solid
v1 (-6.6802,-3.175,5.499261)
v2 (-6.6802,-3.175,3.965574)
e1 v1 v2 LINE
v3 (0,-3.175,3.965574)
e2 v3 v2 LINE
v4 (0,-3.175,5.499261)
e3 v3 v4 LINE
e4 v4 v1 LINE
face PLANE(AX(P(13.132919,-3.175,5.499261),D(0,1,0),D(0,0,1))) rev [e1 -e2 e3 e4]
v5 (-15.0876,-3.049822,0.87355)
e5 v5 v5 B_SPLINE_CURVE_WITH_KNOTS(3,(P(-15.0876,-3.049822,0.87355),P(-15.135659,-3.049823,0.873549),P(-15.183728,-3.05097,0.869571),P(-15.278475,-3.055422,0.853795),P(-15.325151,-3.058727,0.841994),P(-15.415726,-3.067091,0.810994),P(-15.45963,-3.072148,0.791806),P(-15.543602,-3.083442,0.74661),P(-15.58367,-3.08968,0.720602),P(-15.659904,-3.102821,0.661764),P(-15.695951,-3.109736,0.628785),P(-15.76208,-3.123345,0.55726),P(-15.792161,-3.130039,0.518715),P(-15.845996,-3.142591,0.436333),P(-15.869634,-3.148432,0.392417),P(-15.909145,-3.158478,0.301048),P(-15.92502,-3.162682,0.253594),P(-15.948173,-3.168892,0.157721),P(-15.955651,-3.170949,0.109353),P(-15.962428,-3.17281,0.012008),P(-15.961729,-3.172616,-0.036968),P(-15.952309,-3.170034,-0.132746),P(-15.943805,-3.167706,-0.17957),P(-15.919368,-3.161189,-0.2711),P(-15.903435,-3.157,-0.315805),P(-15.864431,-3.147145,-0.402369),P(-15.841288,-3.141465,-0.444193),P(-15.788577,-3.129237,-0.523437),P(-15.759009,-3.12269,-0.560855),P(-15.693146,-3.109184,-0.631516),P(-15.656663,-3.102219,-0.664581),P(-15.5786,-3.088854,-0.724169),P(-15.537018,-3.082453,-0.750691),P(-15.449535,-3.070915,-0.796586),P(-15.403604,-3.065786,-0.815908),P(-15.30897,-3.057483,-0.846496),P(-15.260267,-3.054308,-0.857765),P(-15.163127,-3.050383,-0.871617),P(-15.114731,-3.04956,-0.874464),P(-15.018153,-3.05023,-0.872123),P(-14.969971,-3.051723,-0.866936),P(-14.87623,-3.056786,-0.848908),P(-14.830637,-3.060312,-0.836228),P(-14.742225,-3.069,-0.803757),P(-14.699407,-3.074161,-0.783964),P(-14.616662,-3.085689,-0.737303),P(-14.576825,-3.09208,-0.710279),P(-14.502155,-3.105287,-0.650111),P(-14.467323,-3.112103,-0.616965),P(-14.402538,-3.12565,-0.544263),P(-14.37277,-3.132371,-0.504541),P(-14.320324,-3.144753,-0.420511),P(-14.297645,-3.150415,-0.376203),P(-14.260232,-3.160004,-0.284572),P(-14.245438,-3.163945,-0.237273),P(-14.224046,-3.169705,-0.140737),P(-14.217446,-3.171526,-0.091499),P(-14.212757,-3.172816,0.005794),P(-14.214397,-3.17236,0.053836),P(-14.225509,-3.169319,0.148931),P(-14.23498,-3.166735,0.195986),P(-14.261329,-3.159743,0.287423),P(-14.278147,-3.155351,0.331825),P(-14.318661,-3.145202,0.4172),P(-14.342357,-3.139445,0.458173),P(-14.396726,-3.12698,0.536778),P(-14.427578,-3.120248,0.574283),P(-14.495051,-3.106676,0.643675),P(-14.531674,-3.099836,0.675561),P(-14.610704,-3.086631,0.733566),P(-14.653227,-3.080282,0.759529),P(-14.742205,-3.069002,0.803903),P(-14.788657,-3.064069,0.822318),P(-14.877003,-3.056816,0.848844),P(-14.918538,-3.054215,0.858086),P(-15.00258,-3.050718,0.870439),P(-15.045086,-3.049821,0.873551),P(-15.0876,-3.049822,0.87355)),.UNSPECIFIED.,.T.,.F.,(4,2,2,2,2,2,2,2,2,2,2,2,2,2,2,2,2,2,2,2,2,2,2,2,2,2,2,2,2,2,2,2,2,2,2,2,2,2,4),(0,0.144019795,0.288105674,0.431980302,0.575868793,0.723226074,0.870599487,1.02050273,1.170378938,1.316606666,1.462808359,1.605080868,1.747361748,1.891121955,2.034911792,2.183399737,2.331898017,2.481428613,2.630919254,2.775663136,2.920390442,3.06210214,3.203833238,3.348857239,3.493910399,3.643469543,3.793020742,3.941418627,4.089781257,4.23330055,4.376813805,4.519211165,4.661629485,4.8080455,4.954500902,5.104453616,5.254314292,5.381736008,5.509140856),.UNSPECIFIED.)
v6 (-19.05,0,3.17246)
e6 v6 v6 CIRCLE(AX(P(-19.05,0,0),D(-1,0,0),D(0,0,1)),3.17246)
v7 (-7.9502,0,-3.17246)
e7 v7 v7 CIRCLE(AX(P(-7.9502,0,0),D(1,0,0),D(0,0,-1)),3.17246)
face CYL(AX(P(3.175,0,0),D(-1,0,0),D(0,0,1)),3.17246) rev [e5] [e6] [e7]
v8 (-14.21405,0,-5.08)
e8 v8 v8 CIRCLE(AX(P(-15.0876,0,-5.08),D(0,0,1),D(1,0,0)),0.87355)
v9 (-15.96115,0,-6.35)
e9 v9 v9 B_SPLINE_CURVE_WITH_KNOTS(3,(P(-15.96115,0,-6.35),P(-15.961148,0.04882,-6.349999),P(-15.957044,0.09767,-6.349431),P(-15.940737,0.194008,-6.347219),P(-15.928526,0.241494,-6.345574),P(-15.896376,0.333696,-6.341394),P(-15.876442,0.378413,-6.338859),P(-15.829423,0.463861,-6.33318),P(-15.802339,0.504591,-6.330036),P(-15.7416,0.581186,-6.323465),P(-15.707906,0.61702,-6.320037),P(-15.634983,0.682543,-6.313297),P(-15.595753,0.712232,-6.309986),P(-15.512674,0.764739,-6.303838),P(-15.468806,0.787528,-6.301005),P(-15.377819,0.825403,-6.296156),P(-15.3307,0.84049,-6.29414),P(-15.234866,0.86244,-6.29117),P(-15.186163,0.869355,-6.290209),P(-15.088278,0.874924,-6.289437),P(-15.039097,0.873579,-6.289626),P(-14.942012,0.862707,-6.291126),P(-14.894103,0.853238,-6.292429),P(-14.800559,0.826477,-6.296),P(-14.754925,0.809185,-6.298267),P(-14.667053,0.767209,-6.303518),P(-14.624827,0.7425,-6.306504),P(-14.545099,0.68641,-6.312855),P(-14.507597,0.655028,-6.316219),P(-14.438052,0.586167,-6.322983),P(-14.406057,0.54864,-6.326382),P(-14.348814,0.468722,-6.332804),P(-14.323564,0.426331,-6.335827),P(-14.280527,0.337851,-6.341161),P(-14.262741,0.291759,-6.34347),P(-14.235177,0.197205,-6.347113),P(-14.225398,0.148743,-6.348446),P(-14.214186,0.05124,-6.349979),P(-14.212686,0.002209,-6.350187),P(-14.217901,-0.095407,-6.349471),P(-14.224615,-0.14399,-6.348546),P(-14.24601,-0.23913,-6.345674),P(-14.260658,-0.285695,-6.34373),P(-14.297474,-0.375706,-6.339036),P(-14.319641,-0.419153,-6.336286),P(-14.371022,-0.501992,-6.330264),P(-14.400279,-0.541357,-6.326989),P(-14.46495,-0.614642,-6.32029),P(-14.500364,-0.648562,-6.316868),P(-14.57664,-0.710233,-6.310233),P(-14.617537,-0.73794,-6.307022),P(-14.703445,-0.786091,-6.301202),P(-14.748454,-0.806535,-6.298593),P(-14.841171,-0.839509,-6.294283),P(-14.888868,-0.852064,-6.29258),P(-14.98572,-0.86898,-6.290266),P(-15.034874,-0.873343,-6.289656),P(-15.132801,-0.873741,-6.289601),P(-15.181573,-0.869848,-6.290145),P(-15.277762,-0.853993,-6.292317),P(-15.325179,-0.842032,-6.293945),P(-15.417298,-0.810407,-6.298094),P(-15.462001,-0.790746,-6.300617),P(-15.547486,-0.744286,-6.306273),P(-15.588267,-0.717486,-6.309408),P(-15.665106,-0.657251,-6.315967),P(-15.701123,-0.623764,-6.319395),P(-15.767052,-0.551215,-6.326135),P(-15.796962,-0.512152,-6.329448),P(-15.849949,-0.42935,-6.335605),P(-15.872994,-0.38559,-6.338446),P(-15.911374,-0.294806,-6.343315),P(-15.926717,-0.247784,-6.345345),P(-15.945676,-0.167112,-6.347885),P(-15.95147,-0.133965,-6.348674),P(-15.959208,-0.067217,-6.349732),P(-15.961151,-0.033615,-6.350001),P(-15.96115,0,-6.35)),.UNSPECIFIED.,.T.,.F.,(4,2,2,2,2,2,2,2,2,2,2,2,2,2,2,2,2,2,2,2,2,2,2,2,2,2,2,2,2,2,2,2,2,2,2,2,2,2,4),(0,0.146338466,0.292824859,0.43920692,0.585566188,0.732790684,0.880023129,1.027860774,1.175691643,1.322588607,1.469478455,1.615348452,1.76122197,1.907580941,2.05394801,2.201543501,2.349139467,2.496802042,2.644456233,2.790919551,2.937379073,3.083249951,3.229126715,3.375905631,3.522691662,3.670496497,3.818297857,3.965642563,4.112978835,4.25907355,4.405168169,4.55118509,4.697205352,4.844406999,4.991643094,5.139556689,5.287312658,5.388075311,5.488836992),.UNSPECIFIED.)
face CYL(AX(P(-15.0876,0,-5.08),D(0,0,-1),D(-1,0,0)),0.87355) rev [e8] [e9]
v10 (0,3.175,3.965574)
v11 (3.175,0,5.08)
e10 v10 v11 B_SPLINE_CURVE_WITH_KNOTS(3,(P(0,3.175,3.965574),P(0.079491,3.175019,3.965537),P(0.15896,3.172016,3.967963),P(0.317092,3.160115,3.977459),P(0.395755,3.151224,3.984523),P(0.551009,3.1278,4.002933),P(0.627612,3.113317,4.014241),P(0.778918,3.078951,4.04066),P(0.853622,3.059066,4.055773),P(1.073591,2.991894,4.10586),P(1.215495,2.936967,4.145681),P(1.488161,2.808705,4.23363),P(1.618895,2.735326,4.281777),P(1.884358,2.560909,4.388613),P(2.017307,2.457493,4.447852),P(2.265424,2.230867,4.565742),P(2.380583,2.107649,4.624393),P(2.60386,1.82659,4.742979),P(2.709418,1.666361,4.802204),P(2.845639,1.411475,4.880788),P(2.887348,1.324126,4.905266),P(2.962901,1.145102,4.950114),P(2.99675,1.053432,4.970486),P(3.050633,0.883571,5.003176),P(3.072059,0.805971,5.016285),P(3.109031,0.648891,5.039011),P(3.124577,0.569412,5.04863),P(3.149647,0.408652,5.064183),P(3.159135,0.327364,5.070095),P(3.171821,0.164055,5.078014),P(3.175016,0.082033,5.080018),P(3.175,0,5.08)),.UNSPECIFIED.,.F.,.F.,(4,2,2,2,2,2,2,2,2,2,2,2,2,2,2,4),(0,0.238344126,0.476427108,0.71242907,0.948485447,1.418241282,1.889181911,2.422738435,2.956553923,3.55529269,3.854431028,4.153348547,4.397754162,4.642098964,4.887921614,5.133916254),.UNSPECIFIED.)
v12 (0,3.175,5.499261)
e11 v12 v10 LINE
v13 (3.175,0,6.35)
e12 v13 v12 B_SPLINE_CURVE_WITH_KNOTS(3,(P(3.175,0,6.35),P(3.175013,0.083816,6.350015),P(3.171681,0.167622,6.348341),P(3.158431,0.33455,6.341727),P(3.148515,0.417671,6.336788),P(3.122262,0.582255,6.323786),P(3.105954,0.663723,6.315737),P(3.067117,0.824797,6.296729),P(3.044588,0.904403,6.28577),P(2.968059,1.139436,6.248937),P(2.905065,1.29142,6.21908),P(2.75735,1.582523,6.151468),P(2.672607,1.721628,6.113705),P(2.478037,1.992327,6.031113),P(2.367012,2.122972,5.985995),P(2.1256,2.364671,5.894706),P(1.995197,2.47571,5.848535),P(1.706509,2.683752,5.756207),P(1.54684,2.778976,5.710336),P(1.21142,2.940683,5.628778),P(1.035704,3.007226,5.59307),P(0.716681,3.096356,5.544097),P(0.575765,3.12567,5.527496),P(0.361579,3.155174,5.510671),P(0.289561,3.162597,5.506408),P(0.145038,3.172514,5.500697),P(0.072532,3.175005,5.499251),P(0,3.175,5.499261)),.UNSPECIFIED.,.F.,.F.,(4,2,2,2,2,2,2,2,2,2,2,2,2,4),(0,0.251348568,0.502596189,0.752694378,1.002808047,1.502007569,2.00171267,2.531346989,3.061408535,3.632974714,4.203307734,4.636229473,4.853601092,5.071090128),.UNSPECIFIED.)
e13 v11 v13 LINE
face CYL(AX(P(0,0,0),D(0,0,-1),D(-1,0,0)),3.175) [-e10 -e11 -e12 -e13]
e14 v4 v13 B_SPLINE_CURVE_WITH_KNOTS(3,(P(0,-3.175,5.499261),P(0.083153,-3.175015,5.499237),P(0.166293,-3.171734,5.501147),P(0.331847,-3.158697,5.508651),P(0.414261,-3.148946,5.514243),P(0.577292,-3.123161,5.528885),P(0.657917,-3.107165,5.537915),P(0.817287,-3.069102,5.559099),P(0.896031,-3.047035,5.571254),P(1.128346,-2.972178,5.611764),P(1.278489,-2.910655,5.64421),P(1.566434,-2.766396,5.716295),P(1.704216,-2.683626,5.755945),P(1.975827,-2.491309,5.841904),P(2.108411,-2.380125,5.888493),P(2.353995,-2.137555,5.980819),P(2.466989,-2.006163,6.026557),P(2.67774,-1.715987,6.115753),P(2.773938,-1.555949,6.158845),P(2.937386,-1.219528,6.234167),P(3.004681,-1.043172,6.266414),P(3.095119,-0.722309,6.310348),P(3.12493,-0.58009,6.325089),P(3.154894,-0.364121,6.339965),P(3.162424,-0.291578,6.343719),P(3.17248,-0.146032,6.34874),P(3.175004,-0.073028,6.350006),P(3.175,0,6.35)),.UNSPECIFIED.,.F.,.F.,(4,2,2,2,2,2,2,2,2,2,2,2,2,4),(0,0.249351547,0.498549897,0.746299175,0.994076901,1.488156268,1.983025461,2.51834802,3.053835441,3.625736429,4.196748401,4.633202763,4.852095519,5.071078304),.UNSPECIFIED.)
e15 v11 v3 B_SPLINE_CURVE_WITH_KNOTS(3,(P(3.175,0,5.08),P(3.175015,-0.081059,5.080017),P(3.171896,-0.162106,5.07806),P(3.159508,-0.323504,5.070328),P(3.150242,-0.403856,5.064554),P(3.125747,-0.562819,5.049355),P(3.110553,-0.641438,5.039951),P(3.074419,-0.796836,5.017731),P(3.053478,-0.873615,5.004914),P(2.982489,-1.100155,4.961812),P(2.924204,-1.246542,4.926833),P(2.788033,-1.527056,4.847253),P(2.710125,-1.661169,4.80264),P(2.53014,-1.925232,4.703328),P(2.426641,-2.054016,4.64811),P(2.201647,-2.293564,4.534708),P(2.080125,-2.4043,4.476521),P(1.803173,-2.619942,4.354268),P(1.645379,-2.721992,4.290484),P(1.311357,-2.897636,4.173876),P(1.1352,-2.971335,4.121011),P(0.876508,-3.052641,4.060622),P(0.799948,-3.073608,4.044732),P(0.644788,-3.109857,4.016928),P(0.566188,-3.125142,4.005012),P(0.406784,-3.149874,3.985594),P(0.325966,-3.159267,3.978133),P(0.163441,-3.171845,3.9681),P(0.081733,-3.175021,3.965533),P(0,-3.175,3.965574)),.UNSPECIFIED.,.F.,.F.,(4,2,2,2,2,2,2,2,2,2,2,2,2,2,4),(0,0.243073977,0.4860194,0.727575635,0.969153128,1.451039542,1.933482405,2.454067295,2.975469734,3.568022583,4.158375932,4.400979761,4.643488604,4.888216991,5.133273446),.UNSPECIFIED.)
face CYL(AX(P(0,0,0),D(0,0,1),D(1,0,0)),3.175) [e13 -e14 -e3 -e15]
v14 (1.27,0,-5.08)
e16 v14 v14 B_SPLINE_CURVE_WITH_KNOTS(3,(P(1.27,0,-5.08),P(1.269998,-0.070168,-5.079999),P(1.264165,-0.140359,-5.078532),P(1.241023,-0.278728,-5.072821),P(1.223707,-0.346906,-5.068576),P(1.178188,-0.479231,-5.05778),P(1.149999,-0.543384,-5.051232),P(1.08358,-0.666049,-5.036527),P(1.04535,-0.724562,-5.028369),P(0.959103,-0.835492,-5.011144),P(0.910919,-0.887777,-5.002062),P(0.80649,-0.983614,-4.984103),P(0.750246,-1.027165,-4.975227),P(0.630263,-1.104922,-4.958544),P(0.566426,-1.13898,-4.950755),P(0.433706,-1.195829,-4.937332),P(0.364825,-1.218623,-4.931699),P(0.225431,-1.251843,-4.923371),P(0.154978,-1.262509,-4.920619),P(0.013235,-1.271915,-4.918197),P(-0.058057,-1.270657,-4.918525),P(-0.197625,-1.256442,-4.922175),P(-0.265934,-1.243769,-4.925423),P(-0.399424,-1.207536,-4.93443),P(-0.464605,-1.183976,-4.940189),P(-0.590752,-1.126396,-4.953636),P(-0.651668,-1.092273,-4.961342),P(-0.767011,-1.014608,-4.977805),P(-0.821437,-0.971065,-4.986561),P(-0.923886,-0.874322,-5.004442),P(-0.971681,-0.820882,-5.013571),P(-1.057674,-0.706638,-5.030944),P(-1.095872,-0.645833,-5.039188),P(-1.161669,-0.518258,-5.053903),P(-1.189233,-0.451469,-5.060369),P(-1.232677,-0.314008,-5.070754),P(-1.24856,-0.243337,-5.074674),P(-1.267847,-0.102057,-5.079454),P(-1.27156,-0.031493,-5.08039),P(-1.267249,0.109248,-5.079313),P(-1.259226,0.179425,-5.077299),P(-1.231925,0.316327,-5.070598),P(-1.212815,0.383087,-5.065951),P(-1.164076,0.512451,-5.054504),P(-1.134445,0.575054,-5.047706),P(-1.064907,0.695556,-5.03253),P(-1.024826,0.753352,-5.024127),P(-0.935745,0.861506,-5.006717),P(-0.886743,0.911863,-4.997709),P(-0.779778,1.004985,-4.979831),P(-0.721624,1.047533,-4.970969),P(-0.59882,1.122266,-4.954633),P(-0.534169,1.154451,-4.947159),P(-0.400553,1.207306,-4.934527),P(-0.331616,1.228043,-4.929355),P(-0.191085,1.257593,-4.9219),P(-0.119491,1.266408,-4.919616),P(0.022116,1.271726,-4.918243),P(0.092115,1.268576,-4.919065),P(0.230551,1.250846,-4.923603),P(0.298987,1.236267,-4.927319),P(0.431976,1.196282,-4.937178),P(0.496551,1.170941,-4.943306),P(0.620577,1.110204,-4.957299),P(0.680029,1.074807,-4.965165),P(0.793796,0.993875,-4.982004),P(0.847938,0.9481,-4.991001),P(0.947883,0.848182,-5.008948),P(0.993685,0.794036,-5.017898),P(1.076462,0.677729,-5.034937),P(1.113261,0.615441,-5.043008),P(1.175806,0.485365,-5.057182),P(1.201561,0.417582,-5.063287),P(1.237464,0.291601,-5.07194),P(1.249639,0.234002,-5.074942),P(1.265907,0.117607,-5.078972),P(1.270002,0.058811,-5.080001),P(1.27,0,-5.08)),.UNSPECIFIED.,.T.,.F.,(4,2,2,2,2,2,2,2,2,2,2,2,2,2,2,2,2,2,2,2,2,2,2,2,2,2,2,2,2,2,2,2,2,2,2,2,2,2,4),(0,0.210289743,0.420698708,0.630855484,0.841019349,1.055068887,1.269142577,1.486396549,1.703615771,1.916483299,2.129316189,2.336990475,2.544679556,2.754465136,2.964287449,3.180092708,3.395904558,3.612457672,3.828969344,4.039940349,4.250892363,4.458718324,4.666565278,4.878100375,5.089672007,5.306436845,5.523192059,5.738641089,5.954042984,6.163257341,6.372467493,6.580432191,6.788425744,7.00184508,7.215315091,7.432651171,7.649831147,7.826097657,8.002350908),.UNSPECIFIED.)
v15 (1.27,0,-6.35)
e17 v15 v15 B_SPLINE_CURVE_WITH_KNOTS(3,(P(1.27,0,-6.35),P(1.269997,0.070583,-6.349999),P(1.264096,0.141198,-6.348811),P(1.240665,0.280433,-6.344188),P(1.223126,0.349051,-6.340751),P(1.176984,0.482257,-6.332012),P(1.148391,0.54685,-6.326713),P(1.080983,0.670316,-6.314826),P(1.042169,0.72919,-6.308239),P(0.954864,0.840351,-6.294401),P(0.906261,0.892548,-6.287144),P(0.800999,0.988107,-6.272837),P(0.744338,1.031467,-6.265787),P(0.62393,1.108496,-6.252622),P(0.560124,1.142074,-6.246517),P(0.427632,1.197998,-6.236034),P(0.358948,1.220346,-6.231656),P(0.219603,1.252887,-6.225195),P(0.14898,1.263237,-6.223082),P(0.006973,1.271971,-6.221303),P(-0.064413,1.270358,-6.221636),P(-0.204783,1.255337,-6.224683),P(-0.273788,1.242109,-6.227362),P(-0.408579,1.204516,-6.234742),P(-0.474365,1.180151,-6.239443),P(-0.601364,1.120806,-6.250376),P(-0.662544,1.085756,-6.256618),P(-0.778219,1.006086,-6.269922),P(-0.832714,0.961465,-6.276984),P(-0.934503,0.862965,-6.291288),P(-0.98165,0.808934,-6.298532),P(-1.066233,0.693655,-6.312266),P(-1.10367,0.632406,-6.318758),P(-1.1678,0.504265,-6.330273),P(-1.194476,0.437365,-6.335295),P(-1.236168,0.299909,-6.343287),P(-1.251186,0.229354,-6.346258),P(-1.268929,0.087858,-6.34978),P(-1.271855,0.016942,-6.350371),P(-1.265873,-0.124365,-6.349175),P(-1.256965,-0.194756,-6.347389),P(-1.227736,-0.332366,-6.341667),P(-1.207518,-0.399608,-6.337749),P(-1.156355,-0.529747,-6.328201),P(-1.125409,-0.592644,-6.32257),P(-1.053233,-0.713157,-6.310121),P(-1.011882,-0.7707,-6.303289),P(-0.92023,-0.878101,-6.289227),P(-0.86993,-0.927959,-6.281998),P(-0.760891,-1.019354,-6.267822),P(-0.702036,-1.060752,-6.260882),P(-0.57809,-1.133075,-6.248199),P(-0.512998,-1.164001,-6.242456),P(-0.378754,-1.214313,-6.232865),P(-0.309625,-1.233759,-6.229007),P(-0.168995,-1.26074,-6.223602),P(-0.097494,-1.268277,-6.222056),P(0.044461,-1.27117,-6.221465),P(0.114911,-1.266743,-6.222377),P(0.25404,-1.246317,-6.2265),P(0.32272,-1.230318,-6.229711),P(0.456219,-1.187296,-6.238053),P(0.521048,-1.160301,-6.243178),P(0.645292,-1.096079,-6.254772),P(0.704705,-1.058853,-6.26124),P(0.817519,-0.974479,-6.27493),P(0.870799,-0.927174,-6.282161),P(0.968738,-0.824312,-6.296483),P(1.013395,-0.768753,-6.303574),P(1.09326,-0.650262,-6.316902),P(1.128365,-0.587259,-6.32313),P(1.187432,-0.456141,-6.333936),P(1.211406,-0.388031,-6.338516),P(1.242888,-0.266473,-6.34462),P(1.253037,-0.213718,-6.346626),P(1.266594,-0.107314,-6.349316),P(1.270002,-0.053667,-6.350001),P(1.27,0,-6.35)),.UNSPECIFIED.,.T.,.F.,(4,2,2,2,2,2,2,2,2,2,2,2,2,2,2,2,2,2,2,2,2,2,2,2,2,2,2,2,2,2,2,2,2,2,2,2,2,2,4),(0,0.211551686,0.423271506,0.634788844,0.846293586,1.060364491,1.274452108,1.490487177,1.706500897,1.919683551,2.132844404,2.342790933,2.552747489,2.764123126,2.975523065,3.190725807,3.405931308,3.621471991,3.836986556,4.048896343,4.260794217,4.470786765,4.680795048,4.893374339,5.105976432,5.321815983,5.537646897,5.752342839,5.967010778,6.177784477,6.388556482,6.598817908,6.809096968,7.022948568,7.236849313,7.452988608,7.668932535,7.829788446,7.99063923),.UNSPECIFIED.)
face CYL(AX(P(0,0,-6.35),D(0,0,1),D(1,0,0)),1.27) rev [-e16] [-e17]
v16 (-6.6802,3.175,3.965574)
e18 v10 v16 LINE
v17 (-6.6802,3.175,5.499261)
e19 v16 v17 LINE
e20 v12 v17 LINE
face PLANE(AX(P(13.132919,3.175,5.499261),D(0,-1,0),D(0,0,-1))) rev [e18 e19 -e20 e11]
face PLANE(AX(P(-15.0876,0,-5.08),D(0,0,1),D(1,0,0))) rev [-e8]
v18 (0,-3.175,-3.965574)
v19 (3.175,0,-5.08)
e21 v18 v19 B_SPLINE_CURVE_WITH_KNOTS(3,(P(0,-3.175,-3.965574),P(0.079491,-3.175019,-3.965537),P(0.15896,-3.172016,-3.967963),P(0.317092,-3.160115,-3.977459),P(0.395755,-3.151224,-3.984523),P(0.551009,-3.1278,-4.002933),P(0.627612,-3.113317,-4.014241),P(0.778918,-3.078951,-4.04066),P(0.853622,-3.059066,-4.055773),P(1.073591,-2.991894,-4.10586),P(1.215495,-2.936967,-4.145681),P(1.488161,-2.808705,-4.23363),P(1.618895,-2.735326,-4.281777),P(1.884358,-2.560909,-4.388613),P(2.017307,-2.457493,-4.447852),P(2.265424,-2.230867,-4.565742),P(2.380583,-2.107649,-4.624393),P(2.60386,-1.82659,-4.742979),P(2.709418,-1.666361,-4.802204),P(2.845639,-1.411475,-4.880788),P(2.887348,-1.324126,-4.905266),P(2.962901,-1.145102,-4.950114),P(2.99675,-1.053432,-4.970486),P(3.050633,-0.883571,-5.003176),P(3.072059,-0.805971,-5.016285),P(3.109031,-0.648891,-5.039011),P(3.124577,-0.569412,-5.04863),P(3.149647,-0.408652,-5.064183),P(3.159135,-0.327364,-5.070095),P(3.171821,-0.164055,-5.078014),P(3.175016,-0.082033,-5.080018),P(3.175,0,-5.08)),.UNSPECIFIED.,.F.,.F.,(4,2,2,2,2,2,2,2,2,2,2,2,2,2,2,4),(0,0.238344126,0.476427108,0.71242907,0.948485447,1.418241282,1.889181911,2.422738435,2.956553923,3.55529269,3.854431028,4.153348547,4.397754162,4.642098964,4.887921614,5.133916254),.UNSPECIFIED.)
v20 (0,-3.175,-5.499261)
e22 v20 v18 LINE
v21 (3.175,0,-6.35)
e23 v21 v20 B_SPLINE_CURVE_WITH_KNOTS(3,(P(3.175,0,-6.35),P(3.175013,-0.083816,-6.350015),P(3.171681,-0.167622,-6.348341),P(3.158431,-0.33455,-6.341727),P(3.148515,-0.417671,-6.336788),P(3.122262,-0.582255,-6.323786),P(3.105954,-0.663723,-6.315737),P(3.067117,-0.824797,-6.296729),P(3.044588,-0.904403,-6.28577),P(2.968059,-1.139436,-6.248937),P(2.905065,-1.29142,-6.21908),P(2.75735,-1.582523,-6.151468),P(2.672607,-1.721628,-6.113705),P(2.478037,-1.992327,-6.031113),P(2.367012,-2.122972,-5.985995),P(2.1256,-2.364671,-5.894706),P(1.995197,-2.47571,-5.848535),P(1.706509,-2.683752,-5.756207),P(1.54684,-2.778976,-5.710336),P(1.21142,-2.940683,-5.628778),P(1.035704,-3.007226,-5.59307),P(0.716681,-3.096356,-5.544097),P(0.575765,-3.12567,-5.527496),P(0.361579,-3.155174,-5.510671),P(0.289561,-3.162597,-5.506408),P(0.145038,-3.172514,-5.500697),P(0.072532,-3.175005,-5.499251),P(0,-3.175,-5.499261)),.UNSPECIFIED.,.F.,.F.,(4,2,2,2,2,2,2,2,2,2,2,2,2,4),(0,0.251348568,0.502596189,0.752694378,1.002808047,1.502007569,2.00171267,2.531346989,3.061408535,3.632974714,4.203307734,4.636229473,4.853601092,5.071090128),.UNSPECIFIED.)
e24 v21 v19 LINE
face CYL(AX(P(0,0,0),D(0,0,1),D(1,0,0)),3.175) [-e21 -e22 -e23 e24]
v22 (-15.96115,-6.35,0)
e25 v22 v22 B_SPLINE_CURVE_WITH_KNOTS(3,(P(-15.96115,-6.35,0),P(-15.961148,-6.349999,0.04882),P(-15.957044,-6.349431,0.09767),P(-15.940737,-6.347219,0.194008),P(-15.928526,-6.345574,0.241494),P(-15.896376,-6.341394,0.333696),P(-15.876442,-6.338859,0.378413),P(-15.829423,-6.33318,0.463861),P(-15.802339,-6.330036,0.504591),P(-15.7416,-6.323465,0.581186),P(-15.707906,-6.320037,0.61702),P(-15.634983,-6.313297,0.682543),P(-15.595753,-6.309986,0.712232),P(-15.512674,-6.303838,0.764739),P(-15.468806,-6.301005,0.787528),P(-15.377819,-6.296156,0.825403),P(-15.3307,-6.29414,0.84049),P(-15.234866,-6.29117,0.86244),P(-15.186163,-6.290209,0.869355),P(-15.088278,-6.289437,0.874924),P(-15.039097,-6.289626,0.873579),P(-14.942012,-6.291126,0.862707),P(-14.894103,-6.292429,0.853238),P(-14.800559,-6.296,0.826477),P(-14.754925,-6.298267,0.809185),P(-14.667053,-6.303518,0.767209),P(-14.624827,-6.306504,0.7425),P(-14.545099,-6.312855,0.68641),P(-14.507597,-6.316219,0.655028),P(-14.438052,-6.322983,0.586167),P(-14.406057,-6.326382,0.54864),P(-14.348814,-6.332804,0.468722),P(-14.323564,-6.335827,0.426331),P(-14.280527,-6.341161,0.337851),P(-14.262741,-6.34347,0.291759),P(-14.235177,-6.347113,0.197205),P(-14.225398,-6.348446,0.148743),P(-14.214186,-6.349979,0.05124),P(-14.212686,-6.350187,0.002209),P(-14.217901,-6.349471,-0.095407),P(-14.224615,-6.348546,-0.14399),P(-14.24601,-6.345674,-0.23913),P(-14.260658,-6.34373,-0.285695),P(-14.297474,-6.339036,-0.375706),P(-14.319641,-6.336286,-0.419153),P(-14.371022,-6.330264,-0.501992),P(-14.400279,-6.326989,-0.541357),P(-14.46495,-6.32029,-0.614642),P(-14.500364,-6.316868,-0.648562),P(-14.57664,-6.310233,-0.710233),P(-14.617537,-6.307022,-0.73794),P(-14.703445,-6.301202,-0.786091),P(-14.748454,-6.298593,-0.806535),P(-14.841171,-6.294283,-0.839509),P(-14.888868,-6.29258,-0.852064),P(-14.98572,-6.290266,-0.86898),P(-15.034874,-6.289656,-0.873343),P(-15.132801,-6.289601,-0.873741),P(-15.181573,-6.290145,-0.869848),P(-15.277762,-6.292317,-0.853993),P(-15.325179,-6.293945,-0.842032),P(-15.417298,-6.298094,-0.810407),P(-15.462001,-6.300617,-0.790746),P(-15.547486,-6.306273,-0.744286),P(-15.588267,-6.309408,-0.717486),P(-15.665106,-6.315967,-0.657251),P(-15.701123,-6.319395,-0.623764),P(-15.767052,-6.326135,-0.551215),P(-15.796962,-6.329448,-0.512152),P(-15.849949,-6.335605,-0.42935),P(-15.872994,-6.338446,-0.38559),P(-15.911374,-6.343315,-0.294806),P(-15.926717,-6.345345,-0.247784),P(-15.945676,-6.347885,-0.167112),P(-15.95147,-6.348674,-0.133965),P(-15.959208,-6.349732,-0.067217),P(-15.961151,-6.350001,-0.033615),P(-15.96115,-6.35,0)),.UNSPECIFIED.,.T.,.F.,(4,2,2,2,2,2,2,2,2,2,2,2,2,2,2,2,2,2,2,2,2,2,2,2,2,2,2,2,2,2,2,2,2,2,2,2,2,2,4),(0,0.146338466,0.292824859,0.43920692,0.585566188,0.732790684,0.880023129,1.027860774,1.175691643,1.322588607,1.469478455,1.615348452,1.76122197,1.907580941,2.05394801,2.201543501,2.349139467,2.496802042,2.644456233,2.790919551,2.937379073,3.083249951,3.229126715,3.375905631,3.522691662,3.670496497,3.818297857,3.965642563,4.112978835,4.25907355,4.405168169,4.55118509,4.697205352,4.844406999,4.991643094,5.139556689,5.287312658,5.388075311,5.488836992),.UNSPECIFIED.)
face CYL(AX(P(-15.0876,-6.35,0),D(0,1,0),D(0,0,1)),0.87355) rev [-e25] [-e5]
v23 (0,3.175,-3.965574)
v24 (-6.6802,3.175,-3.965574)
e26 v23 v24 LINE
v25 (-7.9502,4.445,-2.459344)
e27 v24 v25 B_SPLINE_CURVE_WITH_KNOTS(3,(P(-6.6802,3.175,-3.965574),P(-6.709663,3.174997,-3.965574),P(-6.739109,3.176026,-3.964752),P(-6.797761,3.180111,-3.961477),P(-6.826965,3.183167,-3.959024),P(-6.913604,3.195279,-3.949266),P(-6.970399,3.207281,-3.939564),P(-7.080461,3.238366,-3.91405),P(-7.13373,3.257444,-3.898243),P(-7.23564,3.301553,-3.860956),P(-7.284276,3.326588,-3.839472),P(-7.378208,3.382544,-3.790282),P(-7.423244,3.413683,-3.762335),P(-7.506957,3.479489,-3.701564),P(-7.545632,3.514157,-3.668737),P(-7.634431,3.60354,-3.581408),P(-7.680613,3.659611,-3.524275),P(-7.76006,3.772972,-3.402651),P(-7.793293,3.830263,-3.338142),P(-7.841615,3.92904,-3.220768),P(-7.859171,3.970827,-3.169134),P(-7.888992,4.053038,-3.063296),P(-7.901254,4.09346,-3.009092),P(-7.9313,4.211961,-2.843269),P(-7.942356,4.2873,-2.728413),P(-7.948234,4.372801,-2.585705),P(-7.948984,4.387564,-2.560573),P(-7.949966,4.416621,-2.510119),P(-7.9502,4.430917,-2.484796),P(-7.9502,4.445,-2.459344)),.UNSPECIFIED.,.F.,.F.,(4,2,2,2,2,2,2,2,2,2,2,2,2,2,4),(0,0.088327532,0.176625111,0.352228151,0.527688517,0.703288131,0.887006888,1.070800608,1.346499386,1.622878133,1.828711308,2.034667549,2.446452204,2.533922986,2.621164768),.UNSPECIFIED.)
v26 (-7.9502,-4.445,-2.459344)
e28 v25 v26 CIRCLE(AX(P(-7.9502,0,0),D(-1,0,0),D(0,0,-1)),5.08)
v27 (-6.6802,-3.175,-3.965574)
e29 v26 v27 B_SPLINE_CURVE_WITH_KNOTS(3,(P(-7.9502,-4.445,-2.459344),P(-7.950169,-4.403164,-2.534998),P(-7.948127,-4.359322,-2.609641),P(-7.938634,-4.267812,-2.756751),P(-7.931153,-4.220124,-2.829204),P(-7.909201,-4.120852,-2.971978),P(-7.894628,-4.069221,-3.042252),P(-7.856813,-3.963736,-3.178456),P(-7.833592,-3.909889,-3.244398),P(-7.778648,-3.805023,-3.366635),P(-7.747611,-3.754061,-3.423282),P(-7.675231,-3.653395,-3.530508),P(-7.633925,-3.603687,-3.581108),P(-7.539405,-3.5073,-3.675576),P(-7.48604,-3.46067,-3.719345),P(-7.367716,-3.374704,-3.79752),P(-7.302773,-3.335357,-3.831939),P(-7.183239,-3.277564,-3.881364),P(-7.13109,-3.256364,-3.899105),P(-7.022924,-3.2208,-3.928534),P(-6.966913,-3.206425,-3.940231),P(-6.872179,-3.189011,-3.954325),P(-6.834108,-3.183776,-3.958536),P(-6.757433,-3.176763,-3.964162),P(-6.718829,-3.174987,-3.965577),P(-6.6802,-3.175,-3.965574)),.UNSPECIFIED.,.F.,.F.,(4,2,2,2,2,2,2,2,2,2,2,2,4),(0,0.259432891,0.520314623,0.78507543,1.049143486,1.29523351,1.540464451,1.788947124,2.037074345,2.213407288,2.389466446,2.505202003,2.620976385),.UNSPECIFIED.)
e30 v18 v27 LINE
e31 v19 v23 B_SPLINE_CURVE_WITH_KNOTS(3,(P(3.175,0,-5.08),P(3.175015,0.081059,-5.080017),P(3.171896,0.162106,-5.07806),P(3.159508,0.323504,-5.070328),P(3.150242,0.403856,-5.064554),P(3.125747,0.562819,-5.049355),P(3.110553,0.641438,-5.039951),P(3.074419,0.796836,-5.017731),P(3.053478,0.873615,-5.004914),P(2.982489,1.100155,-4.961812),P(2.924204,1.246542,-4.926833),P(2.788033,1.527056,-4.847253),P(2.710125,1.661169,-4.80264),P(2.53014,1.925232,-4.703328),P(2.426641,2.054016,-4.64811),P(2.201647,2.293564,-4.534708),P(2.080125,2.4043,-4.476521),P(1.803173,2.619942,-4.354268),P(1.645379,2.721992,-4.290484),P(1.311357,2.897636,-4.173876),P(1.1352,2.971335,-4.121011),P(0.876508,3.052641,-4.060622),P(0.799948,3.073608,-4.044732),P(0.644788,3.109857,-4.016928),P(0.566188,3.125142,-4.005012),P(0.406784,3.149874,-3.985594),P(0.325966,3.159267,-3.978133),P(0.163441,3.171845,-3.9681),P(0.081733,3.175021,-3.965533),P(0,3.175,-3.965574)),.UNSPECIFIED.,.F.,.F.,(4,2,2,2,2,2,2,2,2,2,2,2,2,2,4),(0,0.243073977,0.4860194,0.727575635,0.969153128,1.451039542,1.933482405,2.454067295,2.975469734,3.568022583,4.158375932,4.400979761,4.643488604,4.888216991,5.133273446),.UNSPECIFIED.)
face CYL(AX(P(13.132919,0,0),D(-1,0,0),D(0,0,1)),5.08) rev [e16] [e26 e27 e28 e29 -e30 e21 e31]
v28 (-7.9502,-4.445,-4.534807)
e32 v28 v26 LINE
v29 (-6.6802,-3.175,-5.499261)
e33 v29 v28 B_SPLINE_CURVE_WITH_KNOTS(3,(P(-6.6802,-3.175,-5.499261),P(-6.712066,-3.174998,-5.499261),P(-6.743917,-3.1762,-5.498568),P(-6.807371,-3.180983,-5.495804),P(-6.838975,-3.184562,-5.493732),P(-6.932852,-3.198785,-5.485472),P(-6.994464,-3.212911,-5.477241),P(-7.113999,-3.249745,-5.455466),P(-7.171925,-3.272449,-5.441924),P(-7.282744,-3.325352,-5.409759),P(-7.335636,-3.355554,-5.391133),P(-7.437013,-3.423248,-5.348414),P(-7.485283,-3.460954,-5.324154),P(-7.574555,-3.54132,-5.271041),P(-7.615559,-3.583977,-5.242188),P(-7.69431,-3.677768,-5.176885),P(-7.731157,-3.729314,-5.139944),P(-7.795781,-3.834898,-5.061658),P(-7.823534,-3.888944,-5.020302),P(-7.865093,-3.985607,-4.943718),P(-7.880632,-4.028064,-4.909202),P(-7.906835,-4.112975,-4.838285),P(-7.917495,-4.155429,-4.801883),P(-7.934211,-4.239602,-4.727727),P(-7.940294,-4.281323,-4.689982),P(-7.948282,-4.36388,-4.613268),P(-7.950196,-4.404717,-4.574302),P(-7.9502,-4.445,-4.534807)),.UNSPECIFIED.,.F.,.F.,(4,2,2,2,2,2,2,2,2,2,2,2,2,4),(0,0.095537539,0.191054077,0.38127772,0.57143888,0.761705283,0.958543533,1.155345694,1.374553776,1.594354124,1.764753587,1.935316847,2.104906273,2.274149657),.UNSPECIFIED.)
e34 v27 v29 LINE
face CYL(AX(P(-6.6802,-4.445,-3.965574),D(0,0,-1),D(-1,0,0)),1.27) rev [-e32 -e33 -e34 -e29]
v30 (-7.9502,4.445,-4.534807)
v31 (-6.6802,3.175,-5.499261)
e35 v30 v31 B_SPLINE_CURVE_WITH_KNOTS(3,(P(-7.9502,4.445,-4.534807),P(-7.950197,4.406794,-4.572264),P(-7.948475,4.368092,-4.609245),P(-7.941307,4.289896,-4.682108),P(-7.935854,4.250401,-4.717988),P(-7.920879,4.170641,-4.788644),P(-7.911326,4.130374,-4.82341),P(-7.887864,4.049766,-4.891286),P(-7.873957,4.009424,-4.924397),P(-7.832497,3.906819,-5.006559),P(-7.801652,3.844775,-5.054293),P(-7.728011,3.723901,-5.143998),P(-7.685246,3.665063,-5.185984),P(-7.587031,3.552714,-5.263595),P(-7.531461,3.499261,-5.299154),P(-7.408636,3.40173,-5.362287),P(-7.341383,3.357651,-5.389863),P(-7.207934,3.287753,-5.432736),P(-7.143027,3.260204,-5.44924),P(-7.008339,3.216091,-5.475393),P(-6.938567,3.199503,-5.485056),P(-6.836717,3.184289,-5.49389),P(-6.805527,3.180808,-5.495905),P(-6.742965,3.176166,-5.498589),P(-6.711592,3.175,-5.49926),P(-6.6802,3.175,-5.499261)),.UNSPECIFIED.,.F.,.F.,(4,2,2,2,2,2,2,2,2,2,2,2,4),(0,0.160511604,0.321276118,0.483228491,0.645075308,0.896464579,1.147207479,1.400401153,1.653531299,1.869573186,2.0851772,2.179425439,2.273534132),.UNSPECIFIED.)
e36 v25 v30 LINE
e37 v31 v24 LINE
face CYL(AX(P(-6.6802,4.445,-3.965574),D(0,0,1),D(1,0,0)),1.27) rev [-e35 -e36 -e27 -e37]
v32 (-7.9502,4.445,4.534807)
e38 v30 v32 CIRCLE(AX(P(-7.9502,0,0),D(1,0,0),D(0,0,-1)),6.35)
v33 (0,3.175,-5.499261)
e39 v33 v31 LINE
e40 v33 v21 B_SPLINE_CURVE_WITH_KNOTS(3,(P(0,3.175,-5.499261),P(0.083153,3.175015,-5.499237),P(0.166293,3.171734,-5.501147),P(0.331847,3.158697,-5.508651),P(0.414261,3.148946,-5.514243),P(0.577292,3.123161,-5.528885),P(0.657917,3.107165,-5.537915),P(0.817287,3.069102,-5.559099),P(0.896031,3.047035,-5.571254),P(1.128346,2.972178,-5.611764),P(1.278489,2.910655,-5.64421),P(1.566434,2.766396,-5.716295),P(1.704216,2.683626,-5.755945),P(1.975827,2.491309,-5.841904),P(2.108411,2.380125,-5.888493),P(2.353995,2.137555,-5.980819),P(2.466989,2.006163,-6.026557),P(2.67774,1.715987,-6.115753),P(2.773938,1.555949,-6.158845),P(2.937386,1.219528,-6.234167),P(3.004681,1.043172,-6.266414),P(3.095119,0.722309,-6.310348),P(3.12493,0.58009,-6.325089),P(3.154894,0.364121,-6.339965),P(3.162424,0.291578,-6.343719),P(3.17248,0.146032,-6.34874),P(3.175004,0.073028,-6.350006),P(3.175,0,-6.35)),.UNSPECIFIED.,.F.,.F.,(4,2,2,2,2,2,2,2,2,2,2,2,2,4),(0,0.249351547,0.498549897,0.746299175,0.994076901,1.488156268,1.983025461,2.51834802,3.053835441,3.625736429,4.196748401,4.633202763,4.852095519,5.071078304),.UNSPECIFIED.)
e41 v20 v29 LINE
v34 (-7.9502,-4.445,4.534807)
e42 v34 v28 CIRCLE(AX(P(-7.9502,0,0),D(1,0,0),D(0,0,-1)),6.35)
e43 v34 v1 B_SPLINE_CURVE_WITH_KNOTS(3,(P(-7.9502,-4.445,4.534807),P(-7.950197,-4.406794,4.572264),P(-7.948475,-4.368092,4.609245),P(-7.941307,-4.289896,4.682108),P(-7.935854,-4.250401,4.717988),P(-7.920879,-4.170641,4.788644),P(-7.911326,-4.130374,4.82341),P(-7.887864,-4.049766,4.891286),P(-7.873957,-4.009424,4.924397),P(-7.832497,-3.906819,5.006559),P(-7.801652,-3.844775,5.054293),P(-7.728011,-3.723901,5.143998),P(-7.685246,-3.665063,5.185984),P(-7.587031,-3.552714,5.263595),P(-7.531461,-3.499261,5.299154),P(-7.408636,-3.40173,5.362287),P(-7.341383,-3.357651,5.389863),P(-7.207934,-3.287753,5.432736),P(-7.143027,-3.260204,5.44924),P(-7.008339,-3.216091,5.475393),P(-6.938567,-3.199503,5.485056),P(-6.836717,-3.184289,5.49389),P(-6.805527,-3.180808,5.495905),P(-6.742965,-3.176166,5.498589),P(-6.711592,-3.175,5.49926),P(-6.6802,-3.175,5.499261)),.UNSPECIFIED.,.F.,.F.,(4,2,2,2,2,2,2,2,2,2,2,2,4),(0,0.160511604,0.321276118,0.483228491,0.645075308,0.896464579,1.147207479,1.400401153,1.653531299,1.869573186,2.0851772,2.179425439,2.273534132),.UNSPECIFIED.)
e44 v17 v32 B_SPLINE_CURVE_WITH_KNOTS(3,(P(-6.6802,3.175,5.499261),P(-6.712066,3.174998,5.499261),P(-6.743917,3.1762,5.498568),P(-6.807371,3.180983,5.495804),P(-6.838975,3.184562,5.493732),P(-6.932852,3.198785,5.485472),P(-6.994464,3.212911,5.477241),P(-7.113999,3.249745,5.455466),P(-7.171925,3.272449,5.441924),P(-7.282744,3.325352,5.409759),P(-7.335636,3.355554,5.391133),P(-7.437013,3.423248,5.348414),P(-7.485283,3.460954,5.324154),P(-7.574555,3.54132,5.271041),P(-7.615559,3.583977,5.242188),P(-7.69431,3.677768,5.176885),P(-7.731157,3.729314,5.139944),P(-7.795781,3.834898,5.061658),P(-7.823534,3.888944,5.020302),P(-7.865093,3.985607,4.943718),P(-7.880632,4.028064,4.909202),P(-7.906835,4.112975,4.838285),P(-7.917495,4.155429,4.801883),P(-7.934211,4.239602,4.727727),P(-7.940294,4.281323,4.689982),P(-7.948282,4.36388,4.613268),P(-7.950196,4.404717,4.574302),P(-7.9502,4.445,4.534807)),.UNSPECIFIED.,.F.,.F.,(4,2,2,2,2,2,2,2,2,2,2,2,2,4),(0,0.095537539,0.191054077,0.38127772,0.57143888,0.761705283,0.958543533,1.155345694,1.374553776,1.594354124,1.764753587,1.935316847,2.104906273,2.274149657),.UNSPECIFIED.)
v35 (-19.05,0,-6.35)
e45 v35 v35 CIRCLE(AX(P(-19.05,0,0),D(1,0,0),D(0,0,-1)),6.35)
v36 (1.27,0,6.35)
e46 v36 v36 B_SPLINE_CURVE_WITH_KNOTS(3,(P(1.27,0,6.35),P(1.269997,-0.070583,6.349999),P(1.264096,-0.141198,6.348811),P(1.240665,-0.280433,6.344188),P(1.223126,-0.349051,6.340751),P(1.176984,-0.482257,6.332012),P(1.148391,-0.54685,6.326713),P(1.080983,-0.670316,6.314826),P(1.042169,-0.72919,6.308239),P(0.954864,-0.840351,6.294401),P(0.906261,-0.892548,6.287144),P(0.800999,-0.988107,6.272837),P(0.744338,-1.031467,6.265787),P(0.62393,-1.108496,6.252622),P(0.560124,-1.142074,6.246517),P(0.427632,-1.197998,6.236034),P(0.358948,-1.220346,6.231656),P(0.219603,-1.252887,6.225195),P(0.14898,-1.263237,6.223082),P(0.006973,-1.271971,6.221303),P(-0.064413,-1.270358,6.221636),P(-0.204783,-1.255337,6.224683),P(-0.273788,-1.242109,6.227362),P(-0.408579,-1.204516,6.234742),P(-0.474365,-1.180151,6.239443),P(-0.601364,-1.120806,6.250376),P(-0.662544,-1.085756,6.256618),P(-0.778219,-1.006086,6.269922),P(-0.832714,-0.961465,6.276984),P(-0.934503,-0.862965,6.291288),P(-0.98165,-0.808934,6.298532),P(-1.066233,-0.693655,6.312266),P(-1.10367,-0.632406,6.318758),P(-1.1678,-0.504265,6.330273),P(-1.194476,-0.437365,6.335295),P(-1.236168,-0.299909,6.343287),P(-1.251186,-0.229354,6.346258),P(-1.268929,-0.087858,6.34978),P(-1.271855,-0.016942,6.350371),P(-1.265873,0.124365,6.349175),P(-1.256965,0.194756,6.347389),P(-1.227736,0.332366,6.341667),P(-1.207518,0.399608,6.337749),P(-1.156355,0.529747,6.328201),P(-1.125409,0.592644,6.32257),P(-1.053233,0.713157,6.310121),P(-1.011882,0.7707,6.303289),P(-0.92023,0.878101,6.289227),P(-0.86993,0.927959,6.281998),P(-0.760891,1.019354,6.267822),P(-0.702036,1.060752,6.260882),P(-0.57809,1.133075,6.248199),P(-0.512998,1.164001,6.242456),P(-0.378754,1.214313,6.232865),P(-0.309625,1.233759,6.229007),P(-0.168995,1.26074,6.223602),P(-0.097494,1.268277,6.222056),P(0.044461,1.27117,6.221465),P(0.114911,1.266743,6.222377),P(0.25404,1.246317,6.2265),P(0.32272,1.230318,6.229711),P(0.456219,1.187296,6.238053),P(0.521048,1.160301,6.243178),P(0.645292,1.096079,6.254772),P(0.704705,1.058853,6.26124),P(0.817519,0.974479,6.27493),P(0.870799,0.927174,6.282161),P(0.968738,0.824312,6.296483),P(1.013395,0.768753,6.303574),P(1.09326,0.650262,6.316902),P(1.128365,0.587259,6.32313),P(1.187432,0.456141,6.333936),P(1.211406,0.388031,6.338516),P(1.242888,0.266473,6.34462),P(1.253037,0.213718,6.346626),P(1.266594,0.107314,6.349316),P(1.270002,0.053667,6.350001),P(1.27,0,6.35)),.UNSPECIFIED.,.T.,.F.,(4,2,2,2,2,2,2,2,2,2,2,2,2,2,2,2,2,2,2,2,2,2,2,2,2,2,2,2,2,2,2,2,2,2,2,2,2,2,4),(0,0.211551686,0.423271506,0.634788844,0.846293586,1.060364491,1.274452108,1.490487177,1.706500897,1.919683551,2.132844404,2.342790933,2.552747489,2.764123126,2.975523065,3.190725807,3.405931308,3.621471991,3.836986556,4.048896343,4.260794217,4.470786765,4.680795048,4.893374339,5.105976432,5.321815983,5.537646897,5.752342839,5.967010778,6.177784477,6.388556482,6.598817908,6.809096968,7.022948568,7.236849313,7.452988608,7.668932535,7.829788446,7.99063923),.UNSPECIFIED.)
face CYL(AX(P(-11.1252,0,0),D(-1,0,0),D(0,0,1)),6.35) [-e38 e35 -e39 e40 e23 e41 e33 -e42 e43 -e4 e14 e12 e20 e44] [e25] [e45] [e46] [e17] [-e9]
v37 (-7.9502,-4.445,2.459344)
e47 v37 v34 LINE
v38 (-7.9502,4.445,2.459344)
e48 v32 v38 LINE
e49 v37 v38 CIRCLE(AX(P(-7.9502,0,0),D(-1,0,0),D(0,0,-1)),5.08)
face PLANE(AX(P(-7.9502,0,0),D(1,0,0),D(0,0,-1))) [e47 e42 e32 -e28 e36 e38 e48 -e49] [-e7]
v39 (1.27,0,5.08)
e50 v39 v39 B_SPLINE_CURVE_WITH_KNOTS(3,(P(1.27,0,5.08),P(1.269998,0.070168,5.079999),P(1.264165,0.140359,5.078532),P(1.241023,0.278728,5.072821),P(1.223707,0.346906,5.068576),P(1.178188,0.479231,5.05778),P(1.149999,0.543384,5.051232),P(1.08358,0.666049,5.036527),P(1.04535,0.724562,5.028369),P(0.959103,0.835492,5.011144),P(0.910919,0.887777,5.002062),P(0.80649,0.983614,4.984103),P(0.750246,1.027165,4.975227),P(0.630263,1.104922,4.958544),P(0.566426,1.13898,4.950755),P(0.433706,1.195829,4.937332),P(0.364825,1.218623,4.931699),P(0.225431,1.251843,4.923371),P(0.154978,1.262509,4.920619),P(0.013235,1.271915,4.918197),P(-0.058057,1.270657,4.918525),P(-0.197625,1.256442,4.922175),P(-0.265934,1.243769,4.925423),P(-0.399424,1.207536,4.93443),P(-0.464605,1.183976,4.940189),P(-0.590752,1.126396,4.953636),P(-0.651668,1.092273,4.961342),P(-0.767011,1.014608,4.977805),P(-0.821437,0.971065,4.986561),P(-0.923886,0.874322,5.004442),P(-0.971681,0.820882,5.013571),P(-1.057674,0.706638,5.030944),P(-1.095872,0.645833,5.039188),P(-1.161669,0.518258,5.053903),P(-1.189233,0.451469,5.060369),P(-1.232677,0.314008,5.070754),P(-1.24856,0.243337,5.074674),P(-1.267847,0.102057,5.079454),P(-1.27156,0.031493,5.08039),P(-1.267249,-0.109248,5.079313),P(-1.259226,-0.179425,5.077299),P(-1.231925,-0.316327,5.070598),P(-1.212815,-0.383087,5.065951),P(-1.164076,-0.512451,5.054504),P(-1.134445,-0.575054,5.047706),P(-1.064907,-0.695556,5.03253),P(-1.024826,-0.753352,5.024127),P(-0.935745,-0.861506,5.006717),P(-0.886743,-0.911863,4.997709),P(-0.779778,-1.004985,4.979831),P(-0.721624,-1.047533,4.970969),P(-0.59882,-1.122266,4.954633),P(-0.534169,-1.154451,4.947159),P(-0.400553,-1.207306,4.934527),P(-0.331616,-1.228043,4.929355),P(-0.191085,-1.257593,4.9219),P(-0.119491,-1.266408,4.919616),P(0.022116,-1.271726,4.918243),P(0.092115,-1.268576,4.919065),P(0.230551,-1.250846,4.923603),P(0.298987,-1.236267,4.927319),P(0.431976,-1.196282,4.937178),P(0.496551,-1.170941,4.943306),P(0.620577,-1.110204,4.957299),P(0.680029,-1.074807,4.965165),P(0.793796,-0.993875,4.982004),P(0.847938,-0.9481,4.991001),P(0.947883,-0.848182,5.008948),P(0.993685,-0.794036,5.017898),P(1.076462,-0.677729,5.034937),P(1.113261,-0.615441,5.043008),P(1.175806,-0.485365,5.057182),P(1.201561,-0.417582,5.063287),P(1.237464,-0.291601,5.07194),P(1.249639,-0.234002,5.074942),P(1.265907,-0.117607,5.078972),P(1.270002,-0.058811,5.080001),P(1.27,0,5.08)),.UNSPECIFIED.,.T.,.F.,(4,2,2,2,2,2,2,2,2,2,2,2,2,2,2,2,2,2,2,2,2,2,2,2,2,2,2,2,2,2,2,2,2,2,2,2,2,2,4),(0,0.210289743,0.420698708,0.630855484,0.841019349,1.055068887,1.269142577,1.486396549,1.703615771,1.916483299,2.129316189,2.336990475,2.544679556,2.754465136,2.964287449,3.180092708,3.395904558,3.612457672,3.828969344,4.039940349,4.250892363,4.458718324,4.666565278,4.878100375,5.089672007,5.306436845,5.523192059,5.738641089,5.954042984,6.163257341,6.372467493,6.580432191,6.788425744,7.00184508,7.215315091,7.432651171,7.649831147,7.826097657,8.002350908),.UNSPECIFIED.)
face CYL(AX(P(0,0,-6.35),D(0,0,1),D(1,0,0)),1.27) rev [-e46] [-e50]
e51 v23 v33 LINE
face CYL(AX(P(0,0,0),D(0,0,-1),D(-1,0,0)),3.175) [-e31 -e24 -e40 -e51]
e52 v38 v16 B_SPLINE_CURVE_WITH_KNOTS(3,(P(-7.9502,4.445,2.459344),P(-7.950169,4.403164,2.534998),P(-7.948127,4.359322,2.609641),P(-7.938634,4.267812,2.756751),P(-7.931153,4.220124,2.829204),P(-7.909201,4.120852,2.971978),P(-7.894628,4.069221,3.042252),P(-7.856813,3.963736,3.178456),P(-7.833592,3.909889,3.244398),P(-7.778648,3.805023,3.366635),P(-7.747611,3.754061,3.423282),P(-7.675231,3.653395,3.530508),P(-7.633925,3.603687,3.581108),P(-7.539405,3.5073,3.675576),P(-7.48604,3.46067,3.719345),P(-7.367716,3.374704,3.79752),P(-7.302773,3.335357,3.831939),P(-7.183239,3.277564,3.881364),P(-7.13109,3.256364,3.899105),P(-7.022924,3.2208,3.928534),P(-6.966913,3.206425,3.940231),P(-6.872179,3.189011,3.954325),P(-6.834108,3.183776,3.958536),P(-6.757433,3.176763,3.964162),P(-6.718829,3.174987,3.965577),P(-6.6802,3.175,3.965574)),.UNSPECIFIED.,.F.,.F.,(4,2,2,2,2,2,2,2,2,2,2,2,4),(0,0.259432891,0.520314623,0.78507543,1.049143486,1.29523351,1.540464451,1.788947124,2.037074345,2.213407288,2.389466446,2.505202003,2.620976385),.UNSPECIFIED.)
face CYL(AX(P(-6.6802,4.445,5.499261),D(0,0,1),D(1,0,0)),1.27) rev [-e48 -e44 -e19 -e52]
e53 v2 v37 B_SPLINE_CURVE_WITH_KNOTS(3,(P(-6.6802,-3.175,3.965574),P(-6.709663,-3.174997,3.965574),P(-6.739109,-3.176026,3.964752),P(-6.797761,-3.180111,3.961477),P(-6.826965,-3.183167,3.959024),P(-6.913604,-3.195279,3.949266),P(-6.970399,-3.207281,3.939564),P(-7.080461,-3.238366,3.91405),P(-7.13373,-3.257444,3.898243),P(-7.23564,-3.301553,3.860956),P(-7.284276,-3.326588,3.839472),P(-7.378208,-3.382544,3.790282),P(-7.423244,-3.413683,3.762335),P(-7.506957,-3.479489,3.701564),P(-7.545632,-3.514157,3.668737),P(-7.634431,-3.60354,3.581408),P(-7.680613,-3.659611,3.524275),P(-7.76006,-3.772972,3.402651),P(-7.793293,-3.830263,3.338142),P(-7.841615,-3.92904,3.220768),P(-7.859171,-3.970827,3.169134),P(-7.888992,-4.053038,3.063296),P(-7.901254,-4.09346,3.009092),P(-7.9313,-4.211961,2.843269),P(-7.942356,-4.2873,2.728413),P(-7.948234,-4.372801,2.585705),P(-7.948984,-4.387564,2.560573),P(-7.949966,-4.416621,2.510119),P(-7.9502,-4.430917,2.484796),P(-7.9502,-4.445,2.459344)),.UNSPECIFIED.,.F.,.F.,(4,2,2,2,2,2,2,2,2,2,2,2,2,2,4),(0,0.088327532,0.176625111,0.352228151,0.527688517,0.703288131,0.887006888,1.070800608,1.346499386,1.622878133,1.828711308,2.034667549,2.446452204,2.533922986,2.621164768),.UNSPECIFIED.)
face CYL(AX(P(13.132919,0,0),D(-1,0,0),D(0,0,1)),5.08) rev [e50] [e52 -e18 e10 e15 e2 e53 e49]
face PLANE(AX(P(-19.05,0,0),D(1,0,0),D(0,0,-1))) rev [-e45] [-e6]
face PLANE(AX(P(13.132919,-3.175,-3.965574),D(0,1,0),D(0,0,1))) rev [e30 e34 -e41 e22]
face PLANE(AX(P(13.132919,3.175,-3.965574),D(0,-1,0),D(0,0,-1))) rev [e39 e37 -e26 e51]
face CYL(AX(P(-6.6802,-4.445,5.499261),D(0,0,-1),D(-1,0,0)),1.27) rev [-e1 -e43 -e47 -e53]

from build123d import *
from build123d.topology import SkipClean

# Parameters (mm, degrees)
SKETCH1_R                   = 6.35
FLANGE_BOTTOM_DEPTH         = 7.9248
SKETCH2_R                   = 6.35
FLANGMIDBODY_DEPTH          = 3.175
FLANGELEGS_DEPTH            = 11.1252
FILLET1_R                   = 3.175
LOCKINGSHAFTHOLE_DEPTH      = 22.060567449
LOCKINGSHAFTHOLE_DEPTH_BACK = 22.060567449
SKETCH4_R                   = 1.27
FILLET3_R                   = 1.27
SKETCH5_R                   = 3.17246
CENTERSHAFTHOLE_DEPTH       = 24.97072446
SKETCH11_R                  = 0.873550069
SET_SCREW_DEPTH             = 22.060567459
SKETCH12_R                  = 0.873550069
SUB_DRILL_DEPTH             = 1.27


# Some blends are built 0.0001 mm under size
with BuildPart() as part:
    # Sketch1 → Flange Bottom (new body)
    with BuildSketch(Plane(origin=(-19.05, 0, 0), x_dir=(0, 0, -1), z_dir=(1, 0, 0))):
        Circle(SKETCH1_R)
    extrude(amount=FLANGE_BOTTOM_DEPTH)

    # Sketch2 → Flangmidbody (add)
    with BuildSketch(Plane(origin=(-11.1252, 0, 0), x_dir=(0, 0, -1), z_dir=(1, 0, 0))):
        Circle(SKETCH2_R)
    extrude(amount=FLANGMIDBODY_DEPTH)

    # Sketch3 → Flangelegs (add)
    with SkipClean():  # the faces are left unmerged after this step: merging them gives an invalid solid
        with BuildSketch(Plane(origin=(-7.9502, 0, 0), x_dir=(0, 0, -1), z_dir=(1, 0, 0))):
            with BuildLine():
                Line((-5.499261314, 3.175), (-3.965573729, 3.175))
                ThreePointArc((-3.965573729, 3.175), (-5.08, 0), (-3.965573729, -3.175))
                Line((-3.965573729, -3.175), (-5.499261314, -3.175))
                ThreePointArc((-5.499261314, -3.175), (-6.35, 0), (-5.499261314, 3.175))
            make_face()
            with BuildLine():
                Line((3.965573729, 3.175), (5.499261314, 3.175))
                ThreePointArc((5.499261314, 3.175), (6.35, 0), (5.499261314, -3.175))
                Line((5.499261314, -3.175), (3.965573729, -3.175))
                ThreePointArc((3.965573729, -3.175), (5.08, 0), (3.965573729, 3.175))
            make_face()
        extrude(amount=FLANGELEGS_DEPTH)

    # Fillet1
    fillet1_edges = [part.edges().sort_by_distance(p)[0] for p in [
        (3.175, -3.175, -4.732417522),
        (3.175, 3.175, -4.732417522),
        (3.175, -3.175, 4.732417522),
        (3.175, 3.175, 4.732417522),
    ]]
    fillet(fillet1_edges, radius=FILLET1_R - 0.0001)  # a hair under: the kernel refuses the full size

    # Sketch4 → Lockingshafthole (cut, two sides: drawn at the far end of the back side and taken through both)
    with BuildSketch(Plane.XY.offset(-LOCKINGSHAFTHOLE_DEPTH_BACK)):
        Circle(SKETCH4_R)
    extrude(amount=LOCKINGSHAFTHOLE_DEPTH + LOCKINGSHAFTHOLE_DEPTH_BACK, mode=Mode.SUBTRACT)

    # Fillet3
    # the kernel refuses this fillet: 1.27 mm, written as the material it adds along each edge
    with BuildSketch(Plane(origin=(-7.9502, 3.175, -0.790573729), x_dir=(1, 0, 0), z_dir=(0, 0, -1))) as fillet3_piece_1_section:
        with BuildLine():
            CenterArc((FILLET3_R, -FILLET3_R), FILLET3_R, 90, 90)
            Line((0, -FILLET3_R), (0, 0))
            Line((0, 0), (FILLET3_R, 0))
        make_face()
    fillet3_piece_1 = extrude(amount=7.883687585, mode=Mode.PRIVATE)
    fillet3_piece_1 = fillet3_piece_1 & Plane(origin=(-7.671308244, 0, 0), x_dir=(0, 0.4999999999999997, -0.8660254037844388), z_dir=(-1, 0, 0)) * Cylinder(6.35, 21, mode=Mode.PRIVATE)
    fillet3_piece_1 = fillet3_piece_1 - Plane(origin=(-7.671308244, 0, 0), x_dir=(0, -0.6249999999999998, -0.7806247497997999), z_dir=(-1, 0, 0)) * Cylinder(5.08, 21, mode=Mode.PRIVATE)
    add(fillet3_piece_1)
    with BuildSketch(Plane(origin=(-7.9502, -3.175, -8.674261314), x_dir=(1, 0, 0), z_dir=(0, 0, 1))) as fillet3_piece_2_section:
        with BuildLine():
            CenterArc((FILLET3_R, -FILLET3_R), FILLET3_R, 90, 90)
            Line((0, -FILLET3_R), (0, 0))
            Line((0, 0), (FILLET3_R, 0))
        make_face()
    fillet3_piece_2 = extrude(amount=7.883687585, mode=Mode.PRIVATE)
    fillet3_piece_2 = fillet3_piece_2 & Plane(origin=(-7.671308757, 0, 0), x_dir=(0, 0.4999999999999997, -0.8660254037844388), z_dir=(-1, 0, 0)) * Cylinder(6.35, 21, mode=Mode.PRIVATE)
    fillet3_piece_2 = fillet3_piece_2 - Plane(origin=(-7.671308757, 0, 0), x_dir=(0, -0.6249999999999998, -0.7806247497997999), z_dir=(-1, 0, 0)) * Cylinder(5.08, 21, mode=Mode.PRIVATE)
    add(fillet3_piece_2)
    with BuildSketch(Plane(origin=(-7.9502, -3.175, 0.790573729), x_dir=(0, -1, 0), z_dir=(0, 0, 1))) as fillet3_piece_3_section:
        with BuildLine():
            CenterArc((FILLET3_R, FILLET3_R), FILLET3_R, 180, 90)
            Line((0, FILLET3_R), (0, 0))
            Line((0, 0), (FILLET3_R, 0))
        make_face()
    fillet3_piece_3 = extrude(amount=7.883687585, mode=Mode.PRIVATE)
    fillet3_piece_3 = fillet3_piece_3 & Plane(origin=(-7.671308363, 0, 0), x_dir=(0, 0, -1), z_dir=(-1, 0, 0)) * Cylinder(6.35, 21, mode=Mode.PRIVATE)
    fillet3_piece_3 = fillet3_piece_3 - Plane(origin=(-7.671308363, 0, 0), x_dir=(0, 0.6250000000000004, 0.7806247497997995), z_dir=(-1, 0, 0)) * Cylinder(5.08, 21, mode=Mode.PRIVATE)
    add(fillet3_piece_3)
    with BuildSketch(Plane(origin=(-7.9502, 3.175, 8.674261314), x_dir=(0, 1, 0), z_dir=(0, 0, -1))) as fillet3_piece_4_section:
        with BuildLine():
            CenterArc((FILLET3_R, FILLET3_R), FILLET3_R, 180, 90)
            Line((0, FILLET3_R), (0, 0))
            Line((0, 0), (FILLET3_R, 0))
        make_face()
    fillet3_piece_4 = extrude(amount=7.883687585, mode=Mode.PRIVATE)
    fillet3_piece_4 = fillet3_piece_4 & Plane(origin=(-7.671308731, 0, 0), x_dir=(0, 0, -1), z_dir=(-1, 0, 0)) * Cylinder(6.35, 21, mode=Mode.PRIVATE)
    fillet3_piece_4 = fillet3_piece_4 - Plane(origin=(-7.671308731, 0, 0), x_dir=(0, 0.6250000000000004, 0.7806247497997995), z_dir=(-1, 0, 0)) * Cylinder(5.08, 21, mode=Mode.PRIVATE)
    add(fillet3_piece_4)

    # Sketch5 → CenterShaftHole (cut, through all)
    with BuildSketch(Plane.ZY.offset(19.05)):
        Circle(SKETCH5_R)
    extrude(amount=-CENTERSHAFTHOLE_DEPTH, mode=Mode.SUBTRACT)

    # Sketch11 → Set Screw (cut, through all)
    with BuildSketch(Plane(origin=(0, 0, 0), x_dir=(1, 0, 0), z_dir=(0, 1, 0))):
        with Locations(Location((-15.0876, 0, 0), (0, 0, 270))):
            Circle(SKETCH11_R)
    extrude(amount=-SET_SCREW_DEPTH, mode=Mode.SUBTRACT)

    # Sketch12 → Sub Drill (cut)
    with BuildSketch(Plane.XY.offset(-6.35)):
        with Locations((-15.0876, 0)):
            Circle(SKETCH12_R)
    extrude(amount=SUB_DRILL_DEPTH, mode=Mode.SUBTRACT)


solid = part.part
